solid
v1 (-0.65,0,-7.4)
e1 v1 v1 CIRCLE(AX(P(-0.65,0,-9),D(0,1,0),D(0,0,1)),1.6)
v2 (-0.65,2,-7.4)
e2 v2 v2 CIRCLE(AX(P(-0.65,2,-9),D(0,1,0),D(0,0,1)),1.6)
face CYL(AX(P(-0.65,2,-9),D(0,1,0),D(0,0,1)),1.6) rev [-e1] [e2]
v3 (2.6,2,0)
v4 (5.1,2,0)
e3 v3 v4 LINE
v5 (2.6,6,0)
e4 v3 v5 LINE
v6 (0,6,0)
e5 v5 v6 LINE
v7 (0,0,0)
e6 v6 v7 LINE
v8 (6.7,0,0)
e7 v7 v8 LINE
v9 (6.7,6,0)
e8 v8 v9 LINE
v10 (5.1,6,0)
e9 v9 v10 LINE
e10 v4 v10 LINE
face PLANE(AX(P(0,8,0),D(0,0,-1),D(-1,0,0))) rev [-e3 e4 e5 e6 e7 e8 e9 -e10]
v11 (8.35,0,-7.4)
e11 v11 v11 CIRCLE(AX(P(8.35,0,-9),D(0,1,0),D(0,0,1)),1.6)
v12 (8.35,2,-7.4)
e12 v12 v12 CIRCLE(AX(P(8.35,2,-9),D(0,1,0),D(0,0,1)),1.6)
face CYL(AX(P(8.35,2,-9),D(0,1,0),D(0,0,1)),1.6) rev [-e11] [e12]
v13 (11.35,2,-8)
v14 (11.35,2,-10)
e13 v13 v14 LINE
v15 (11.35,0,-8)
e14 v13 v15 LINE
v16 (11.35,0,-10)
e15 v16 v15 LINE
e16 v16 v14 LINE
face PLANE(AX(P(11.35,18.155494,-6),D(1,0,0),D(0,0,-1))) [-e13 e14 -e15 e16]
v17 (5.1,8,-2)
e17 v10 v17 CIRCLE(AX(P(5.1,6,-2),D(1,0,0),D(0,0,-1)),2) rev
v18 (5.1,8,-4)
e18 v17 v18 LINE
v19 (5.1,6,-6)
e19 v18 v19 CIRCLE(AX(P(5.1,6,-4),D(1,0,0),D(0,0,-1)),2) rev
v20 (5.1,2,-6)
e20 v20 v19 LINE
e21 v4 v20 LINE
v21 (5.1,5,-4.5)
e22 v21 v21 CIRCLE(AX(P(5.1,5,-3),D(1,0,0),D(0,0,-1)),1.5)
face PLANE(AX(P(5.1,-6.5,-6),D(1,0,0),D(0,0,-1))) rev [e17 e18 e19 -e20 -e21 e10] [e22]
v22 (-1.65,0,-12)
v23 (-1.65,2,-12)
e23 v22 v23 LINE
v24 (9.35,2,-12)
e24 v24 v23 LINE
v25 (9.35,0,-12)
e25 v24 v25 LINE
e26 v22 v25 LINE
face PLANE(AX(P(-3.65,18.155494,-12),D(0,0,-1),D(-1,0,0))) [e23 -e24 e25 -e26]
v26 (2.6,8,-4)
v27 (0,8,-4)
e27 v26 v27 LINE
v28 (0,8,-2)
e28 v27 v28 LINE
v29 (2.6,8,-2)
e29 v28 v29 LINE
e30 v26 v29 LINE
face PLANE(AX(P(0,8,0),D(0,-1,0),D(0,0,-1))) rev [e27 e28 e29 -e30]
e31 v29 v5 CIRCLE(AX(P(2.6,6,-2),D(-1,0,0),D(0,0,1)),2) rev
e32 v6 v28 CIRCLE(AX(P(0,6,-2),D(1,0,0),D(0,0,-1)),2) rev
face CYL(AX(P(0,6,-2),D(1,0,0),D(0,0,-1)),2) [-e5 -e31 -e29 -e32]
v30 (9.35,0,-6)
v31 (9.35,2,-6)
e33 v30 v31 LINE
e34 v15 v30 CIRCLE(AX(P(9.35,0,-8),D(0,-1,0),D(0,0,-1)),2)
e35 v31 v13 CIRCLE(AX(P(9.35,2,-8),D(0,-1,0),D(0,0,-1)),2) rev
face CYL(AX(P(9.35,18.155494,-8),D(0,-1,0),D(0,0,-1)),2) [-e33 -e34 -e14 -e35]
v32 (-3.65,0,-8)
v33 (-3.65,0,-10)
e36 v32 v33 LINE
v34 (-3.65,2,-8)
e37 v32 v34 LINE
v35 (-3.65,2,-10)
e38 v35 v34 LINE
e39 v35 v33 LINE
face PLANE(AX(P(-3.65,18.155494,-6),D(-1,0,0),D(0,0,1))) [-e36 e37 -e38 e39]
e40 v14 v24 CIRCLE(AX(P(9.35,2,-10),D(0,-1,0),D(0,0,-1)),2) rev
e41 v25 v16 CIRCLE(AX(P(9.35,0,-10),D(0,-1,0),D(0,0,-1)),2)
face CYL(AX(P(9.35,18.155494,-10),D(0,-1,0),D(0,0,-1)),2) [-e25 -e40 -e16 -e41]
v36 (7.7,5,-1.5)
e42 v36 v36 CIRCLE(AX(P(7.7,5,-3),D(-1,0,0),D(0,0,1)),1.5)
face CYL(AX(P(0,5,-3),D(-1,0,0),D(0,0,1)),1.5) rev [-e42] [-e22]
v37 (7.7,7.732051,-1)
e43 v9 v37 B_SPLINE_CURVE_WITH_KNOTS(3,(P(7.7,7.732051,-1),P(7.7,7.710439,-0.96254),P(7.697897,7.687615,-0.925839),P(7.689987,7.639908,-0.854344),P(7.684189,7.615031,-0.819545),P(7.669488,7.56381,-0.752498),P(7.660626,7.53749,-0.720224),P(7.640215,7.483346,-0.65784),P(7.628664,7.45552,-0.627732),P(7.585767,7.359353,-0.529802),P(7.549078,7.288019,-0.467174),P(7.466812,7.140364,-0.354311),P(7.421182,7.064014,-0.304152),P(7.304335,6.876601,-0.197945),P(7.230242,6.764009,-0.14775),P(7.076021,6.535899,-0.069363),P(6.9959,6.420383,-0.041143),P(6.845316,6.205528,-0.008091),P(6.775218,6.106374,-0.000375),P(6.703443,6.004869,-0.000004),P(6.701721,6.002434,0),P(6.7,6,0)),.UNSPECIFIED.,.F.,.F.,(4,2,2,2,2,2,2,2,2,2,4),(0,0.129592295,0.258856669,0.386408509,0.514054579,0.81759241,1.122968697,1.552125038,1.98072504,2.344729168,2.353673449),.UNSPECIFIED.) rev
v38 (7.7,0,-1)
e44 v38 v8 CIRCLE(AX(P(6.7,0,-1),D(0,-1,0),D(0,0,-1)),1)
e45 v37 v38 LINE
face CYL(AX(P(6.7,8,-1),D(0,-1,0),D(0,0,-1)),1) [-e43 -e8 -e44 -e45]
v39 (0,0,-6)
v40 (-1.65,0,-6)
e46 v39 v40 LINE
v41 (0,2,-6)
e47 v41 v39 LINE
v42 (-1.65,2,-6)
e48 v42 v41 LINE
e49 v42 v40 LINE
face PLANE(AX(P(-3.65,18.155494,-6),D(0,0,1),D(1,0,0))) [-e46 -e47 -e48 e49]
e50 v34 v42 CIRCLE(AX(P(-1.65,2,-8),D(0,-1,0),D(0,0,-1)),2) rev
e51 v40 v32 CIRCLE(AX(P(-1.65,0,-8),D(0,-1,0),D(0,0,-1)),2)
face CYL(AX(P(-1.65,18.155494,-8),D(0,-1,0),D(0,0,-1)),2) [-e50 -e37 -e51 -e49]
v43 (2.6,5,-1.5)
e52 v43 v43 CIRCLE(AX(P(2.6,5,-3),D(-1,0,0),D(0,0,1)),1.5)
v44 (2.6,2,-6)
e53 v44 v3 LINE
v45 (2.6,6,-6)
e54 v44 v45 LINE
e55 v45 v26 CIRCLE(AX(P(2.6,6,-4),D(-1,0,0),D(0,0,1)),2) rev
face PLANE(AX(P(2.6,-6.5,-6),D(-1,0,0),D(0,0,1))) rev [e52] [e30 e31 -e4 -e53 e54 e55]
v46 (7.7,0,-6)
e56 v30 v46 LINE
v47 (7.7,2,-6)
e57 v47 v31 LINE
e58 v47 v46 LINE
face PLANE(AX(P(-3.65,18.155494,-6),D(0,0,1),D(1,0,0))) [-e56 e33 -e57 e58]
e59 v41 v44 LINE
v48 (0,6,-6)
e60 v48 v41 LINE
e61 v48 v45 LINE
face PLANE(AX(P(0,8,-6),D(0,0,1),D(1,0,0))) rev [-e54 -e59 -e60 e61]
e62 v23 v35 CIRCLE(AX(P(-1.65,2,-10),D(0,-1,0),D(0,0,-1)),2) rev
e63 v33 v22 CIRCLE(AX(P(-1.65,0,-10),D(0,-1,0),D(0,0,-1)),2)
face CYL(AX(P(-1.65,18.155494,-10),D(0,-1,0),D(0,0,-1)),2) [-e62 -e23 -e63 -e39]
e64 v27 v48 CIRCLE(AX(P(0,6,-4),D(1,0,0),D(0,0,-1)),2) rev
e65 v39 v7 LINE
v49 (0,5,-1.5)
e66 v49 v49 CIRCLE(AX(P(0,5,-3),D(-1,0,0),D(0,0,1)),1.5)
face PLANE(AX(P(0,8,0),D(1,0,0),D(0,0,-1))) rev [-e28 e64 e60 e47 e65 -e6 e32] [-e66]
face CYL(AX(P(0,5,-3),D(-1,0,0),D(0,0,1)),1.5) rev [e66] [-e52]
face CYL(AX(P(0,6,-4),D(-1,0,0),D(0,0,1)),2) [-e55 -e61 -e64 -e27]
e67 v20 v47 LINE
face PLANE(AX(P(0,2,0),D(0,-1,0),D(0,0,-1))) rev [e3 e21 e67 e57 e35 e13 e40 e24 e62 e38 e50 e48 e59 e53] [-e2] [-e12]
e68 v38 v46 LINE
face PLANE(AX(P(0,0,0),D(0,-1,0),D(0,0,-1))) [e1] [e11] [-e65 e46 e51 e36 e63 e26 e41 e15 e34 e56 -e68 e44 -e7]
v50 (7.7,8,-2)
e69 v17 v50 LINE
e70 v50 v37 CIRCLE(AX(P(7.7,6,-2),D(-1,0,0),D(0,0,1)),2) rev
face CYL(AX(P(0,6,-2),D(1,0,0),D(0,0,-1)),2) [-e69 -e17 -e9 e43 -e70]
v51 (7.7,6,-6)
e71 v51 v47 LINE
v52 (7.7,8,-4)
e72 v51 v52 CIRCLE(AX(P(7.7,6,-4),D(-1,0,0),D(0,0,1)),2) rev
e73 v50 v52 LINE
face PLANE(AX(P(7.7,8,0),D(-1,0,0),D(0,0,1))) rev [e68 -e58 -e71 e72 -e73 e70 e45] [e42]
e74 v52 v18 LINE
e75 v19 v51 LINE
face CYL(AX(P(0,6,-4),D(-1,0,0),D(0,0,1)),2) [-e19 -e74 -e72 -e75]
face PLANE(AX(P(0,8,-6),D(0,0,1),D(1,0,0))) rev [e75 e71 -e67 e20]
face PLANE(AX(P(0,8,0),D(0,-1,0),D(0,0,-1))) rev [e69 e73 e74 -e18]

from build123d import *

# Parameters (mm, degrees)
SKETCH1_W             = 7.7
SKETCH1_H             = 6
BOSS_EXTRUDE1_DEPTH   = 8
SKETCH2_W             = 2.5
SKETCH2_H             = 6
CUT_EXTRUDE1_DEPTH    = 6
F_3_0MM_DOWEL_HOLE1_D = 3
SKETCH7_W             = 15
SKETCH7_H             = 6
BOSS_EXTRUDE2_DEPTH   = 2
M3_CLEARANCE_HOLE1_D  = 3.2
FILLET1_R             = 2
FILLET2_R             = 1


with BuildPart() as part:
    # Sketch1 → Boss-Extrude1 (new body)
    with BuildSketch(Plane(origin=(0, 0, 0), x_dir=(1, 0, 0), z_dir=(0, 1, 0))):
        with Locations((3.85, 3)):
            Rectangle(SKETCH1_W, SKETCH1_H)
    extrude(amount=BOSS_EXTRUDE1_DEPTH)

    # Sketch2 → Cut-Extrude1 (cut)
    with BuildSketch(Plane(origin=(0, 8, 0), x_dir=(1, 0, 0), z_dir=(0, 1, 0))):
        with Locations((3.85, 3)):
            Rectangle(SKETCH2_W, SKETCH2_H)
    extrude(amount=-CUT_EXTRUDE1_DEPTH, mode=Mode.SUBTRACT)

    # Ø3.0mm Dowel Hole1 (through all)
    with Locations(Plane.ZY):
        with Locations((-3, 5)):
            Hole(F_3_0MM_DOWEL_HOLE1_D / 2)

    # Sketch7 → Boss-Extrude2 (add)
    with BuildSketch(Plane.XZ):
        with Locations((3.85, -9)):
            Rectangle(SKETCH7_W, SKETCH7_H)
    extrude(amount=-BOSS_EXTRUDE2_DEPTH)

    # M3 Clearance Hole1 (through all)
    with Locations(Plane(origin=(0, 2, 0), x_dir=(1, 0, 0), z_dir=(0, 1, 0))):
        with Locations((-0.65, 9), (8.35, 9)):
            Hole(M3_CLEARANCE_HOLE1_D / 2)

    # Fillet1
    fillet1_edges = [part.edges().sort_by_distance(p)[0] for p in [
        (6.4, 8, 0),
        (1.3, 8, -6),
        (6.4, 8, -6),
        (-3.65, 1, -6),
        (-3.65, 1, -12),
        (11.35, 1, -6),
        (11.35, 1, -12),
        (1.3, 8, 0),
    ]]
    fillet(fillet1_edges, radius=FILLET1_R)

    # Fillet2
    # the kernel refuses this fillet: 1 mm, written as the material it takes off along each edge
    with BuildSketch(Plane(origin=(7.7, -2.5, 0), x_dir=(-1, 0, 0), z_dir=(0, 1, 0))) as fillet2_piece_1:
        with BuildLine():
            CenterArc((FILLET2_R, -FILLET2_R), FILLET2_R, 90, 90)
            Line((0, -FILLET2_R), (0, 0))
            Line((0, 0), (FILLET2_R, 0))
        make_face()
    extrude(amount=11, mode=Mode.SUBTRACT)


solid = part.part
